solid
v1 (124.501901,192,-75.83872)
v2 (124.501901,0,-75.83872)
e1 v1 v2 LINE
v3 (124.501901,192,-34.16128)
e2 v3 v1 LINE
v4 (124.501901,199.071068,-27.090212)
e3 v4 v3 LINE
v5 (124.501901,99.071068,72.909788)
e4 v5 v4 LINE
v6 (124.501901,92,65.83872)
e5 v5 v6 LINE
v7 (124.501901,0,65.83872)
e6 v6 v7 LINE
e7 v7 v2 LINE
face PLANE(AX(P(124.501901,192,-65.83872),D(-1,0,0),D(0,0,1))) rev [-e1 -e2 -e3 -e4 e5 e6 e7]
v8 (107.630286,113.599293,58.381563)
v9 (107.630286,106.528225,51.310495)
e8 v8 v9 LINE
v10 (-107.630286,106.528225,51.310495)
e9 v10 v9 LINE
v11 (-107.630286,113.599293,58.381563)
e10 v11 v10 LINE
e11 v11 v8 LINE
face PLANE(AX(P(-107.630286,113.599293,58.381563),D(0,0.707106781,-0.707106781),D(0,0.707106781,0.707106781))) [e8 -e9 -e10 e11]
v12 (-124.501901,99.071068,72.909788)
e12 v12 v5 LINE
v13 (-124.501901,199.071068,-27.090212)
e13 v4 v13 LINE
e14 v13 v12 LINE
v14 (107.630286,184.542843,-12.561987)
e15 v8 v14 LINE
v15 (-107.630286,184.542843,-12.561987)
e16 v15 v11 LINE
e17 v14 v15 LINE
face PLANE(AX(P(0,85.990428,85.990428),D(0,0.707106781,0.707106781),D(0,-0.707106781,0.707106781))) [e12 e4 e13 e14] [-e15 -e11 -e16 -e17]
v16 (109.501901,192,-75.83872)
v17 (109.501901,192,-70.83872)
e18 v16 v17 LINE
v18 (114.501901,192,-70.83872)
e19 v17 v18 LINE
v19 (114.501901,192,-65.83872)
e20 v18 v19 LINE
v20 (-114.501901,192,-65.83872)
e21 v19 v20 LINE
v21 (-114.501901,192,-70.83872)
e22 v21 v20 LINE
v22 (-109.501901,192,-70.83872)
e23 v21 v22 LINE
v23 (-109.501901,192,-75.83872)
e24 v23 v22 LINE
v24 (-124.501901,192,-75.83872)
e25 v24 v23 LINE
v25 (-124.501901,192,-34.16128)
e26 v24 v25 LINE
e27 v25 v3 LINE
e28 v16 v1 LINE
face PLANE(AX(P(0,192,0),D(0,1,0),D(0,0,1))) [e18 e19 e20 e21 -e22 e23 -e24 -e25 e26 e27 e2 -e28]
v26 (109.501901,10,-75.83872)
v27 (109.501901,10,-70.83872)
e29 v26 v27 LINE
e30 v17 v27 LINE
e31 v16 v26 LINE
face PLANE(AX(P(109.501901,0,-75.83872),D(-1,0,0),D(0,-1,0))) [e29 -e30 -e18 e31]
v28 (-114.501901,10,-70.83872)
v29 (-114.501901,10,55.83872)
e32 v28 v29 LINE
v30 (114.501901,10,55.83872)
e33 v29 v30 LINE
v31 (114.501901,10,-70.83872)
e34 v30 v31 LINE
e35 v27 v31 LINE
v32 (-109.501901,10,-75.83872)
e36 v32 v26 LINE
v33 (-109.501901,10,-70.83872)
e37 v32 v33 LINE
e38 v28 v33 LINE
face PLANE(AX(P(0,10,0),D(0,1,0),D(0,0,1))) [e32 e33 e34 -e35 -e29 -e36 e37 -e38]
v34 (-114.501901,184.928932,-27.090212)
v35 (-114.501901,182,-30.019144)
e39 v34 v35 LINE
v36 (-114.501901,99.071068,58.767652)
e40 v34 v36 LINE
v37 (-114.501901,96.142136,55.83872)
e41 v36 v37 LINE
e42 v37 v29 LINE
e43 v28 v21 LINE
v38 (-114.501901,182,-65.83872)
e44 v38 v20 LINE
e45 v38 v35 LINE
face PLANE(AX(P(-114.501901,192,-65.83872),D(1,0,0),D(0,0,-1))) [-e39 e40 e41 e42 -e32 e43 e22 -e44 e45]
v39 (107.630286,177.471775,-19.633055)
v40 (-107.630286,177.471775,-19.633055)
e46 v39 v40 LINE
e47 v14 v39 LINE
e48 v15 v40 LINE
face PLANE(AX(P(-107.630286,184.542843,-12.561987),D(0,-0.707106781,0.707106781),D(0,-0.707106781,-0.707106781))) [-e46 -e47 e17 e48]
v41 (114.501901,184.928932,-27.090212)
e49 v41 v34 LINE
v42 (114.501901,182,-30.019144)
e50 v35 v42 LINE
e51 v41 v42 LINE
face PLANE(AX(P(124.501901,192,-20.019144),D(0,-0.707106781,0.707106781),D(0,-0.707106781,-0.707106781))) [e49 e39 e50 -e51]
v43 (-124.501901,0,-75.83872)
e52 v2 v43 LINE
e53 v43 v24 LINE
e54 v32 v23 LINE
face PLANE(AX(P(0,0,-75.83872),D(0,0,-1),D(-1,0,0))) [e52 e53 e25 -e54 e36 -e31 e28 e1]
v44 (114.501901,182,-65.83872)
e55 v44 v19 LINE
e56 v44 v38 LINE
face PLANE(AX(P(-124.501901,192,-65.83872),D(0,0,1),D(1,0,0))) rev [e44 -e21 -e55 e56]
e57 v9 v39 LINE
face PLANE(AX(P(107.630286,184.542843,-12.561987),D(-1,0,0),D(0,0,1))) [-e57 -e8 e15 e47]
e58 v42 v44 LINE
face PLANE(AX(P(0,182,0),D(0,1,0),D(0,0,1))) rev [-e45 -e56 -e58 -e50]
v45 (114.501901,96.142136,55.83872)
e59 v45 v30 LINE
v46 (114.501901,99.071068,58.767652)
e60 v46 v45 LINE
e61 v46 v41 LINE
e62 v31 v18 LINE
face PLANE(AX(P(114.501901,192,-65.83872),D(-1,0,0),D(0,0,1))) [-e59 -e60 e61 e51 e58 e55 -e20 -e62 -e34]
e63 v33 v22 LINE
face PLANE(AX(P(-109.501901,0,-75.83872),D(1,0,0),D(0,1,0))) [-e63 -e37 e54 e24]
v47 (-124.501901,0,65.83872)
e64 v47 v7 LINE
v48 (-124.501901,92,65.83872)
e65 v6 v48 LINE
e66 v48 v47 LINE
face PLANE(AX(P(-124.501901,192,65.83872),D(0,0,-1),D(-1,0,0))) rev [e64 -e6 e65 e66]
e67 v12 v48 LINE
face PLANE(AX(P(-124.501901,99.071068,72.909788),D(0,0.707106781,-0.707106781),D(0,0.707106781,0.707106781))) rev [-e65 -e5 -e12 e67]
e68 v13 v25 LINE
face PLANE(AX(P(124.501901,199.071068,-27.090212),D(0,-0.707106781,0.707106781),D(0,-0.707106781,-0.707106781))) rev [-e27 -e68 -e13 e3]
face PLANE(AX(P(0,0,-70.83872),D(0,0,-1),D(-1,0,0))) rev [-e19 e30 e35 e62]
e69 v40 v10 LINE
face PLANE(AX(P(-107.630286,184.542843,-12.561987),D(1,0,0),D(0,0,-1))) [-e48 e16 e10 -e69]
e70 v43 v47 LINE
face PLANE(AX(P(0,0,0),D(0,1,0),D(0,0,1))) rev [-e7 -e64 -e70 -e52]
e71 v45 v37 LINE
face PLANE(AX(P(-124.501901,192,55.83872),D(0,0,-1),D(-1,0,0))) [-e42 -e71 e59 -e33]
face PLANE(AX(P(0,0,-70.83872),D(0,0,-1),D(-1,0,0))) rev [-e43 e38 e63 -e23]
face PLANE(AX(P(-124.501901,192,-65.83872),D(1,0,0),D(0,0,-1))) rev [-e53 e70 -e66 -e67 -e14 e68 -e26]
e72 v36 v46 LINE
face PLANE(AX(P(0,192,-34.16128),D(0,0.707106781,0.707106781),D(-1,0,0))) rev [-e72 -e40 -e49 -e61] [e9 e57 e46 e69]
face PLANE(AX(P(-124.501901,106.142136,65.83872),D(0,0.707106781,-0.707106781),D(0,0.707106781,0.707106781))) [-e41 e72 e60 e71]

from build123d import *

# Parameters (mm, degrees)
SKETCH1_W           = 249.00380235
SKETCH1_H           = 131.677440474
BOSS_EXTRUDE1_DEPTH = 192
CHAMFER1_SIZE       = 100
SKETCH2_W           = 249.00380235
SKETCH2_H           = 141.421356237
SKETCH2_W_2         = 215.26057226
SKETCH2_H_2         = 100.329330499
BOSS_EXTRUDE2_DEPTH = 10
SHELL1_START        = -114.501901175
SHELL1_DEPTH        = 229.00380235
BOSS_EXTRUDE3_DEPTH = 5
SKETCH4_W           = 5
SKETCH4_H           = 182
BOSS_EXTRUDE4_DEPTH = 5


# Read off the part's stored shape, not the designer's step: Shell1
with BuildPart() as part:
    # Sketch1 → Boss-Extrude1 (new body)
    with BuildSketch(Plane(origin=(0, 0, 0), x_dir=(1, 0, 0), z_dir=(0, 1, 0))):
        Rectangle(SKETCH1_W, SKETCH1_H)
    extrude(amount=BOSS_EXTRUDE1_DEPTH)

    # Chamfer1
    chamfer1_edges = [part.edges().sort_by_distance(p)[0] for p in [
        (0, 192, 65.838720237),
    ]]
    chamfer(chamfer1_edges, length=CHAMFER1_SIZE)

    # Sketch2 → Boss-Extrude2 (add)
    with BuildSketch(Plane(origin=(0, 78.919360119, 78.919360119), x_dir=(1, 0, 0), z_dir=(0, 0.7071067811865464, 0.7071067811865487))):
        with Locations((0, 89.209496444)):
            Rectangle(SKETCH2_W, SKETCH2_H)
        with Locations((0, 89.209496444)):
            Rectangle(SKETCH2_W_2, SKETCH2_H_2, mode=Mode.SUBTRACT)
    extrude(amount=BOSS_EXTRUDE2_DEPTH)

    # Shell1 outline → Shell1 (cut)
    with BuildSketch(Plane.YZ.offset(SHELL1_START)):
        Polygon((96.142135624, 55.838720237), (10, 55.838720237), (10, -65.838720237), (182, -65.838720237), (182, -30.019144139), (184.928932188, -27.090211951), (99.071067812, 58.767652425), align=None)
    extrude(amount=SHELL1_DEPTH, mode=Mode.SUBTRACT)

    # Sketch3 → Boss-Extrude3 (add)
    with BuildSketch(Plane(origin=(0, 0, -65.838720237), x_dir=(-1, 0, 0), z_dir=(0, 0, -1))):
        Polygon((-114.501901175, 10), (-114.501901175, 182), (-114.501901175, 192), (-124.501901175, 192), (-124.501901175, 0), (124.501901175, 0), (124.501901175, 192), (114.501901175, 192), (114.501901175, 182), (114.501901175, 10), align=None)
    extrude(amount=BOSS_EXTRUDE3_DEPTH)

    # Sketch4 → Boss-Extrude4 (add)
    with BuildSketch(Plane(origin=(0, 0, -70.838720237), x_dir=(-1, 0, 0), z_dir=(0, 0, -1))):
        Polygon((124.501901175, 192), (114.501901175, 192), (114.501901175, 10), (-114.501901175, 10), (-114.501901175, 192), (-124.501901175, 192), (-124.501901175, 0), (124.501901175, 0), align=None)
        with Locations((112.001901175, 101)):
            Rectangle(SKETCH4_W, SKETCH4_H)
        with Locations((-112.001901175, 101)):
            Rectangle(SKETCH4_W, SKETCH4_H)
    extrude(amount=BOSS_EXTRUDE4_DEPTH)


solid = part.part
